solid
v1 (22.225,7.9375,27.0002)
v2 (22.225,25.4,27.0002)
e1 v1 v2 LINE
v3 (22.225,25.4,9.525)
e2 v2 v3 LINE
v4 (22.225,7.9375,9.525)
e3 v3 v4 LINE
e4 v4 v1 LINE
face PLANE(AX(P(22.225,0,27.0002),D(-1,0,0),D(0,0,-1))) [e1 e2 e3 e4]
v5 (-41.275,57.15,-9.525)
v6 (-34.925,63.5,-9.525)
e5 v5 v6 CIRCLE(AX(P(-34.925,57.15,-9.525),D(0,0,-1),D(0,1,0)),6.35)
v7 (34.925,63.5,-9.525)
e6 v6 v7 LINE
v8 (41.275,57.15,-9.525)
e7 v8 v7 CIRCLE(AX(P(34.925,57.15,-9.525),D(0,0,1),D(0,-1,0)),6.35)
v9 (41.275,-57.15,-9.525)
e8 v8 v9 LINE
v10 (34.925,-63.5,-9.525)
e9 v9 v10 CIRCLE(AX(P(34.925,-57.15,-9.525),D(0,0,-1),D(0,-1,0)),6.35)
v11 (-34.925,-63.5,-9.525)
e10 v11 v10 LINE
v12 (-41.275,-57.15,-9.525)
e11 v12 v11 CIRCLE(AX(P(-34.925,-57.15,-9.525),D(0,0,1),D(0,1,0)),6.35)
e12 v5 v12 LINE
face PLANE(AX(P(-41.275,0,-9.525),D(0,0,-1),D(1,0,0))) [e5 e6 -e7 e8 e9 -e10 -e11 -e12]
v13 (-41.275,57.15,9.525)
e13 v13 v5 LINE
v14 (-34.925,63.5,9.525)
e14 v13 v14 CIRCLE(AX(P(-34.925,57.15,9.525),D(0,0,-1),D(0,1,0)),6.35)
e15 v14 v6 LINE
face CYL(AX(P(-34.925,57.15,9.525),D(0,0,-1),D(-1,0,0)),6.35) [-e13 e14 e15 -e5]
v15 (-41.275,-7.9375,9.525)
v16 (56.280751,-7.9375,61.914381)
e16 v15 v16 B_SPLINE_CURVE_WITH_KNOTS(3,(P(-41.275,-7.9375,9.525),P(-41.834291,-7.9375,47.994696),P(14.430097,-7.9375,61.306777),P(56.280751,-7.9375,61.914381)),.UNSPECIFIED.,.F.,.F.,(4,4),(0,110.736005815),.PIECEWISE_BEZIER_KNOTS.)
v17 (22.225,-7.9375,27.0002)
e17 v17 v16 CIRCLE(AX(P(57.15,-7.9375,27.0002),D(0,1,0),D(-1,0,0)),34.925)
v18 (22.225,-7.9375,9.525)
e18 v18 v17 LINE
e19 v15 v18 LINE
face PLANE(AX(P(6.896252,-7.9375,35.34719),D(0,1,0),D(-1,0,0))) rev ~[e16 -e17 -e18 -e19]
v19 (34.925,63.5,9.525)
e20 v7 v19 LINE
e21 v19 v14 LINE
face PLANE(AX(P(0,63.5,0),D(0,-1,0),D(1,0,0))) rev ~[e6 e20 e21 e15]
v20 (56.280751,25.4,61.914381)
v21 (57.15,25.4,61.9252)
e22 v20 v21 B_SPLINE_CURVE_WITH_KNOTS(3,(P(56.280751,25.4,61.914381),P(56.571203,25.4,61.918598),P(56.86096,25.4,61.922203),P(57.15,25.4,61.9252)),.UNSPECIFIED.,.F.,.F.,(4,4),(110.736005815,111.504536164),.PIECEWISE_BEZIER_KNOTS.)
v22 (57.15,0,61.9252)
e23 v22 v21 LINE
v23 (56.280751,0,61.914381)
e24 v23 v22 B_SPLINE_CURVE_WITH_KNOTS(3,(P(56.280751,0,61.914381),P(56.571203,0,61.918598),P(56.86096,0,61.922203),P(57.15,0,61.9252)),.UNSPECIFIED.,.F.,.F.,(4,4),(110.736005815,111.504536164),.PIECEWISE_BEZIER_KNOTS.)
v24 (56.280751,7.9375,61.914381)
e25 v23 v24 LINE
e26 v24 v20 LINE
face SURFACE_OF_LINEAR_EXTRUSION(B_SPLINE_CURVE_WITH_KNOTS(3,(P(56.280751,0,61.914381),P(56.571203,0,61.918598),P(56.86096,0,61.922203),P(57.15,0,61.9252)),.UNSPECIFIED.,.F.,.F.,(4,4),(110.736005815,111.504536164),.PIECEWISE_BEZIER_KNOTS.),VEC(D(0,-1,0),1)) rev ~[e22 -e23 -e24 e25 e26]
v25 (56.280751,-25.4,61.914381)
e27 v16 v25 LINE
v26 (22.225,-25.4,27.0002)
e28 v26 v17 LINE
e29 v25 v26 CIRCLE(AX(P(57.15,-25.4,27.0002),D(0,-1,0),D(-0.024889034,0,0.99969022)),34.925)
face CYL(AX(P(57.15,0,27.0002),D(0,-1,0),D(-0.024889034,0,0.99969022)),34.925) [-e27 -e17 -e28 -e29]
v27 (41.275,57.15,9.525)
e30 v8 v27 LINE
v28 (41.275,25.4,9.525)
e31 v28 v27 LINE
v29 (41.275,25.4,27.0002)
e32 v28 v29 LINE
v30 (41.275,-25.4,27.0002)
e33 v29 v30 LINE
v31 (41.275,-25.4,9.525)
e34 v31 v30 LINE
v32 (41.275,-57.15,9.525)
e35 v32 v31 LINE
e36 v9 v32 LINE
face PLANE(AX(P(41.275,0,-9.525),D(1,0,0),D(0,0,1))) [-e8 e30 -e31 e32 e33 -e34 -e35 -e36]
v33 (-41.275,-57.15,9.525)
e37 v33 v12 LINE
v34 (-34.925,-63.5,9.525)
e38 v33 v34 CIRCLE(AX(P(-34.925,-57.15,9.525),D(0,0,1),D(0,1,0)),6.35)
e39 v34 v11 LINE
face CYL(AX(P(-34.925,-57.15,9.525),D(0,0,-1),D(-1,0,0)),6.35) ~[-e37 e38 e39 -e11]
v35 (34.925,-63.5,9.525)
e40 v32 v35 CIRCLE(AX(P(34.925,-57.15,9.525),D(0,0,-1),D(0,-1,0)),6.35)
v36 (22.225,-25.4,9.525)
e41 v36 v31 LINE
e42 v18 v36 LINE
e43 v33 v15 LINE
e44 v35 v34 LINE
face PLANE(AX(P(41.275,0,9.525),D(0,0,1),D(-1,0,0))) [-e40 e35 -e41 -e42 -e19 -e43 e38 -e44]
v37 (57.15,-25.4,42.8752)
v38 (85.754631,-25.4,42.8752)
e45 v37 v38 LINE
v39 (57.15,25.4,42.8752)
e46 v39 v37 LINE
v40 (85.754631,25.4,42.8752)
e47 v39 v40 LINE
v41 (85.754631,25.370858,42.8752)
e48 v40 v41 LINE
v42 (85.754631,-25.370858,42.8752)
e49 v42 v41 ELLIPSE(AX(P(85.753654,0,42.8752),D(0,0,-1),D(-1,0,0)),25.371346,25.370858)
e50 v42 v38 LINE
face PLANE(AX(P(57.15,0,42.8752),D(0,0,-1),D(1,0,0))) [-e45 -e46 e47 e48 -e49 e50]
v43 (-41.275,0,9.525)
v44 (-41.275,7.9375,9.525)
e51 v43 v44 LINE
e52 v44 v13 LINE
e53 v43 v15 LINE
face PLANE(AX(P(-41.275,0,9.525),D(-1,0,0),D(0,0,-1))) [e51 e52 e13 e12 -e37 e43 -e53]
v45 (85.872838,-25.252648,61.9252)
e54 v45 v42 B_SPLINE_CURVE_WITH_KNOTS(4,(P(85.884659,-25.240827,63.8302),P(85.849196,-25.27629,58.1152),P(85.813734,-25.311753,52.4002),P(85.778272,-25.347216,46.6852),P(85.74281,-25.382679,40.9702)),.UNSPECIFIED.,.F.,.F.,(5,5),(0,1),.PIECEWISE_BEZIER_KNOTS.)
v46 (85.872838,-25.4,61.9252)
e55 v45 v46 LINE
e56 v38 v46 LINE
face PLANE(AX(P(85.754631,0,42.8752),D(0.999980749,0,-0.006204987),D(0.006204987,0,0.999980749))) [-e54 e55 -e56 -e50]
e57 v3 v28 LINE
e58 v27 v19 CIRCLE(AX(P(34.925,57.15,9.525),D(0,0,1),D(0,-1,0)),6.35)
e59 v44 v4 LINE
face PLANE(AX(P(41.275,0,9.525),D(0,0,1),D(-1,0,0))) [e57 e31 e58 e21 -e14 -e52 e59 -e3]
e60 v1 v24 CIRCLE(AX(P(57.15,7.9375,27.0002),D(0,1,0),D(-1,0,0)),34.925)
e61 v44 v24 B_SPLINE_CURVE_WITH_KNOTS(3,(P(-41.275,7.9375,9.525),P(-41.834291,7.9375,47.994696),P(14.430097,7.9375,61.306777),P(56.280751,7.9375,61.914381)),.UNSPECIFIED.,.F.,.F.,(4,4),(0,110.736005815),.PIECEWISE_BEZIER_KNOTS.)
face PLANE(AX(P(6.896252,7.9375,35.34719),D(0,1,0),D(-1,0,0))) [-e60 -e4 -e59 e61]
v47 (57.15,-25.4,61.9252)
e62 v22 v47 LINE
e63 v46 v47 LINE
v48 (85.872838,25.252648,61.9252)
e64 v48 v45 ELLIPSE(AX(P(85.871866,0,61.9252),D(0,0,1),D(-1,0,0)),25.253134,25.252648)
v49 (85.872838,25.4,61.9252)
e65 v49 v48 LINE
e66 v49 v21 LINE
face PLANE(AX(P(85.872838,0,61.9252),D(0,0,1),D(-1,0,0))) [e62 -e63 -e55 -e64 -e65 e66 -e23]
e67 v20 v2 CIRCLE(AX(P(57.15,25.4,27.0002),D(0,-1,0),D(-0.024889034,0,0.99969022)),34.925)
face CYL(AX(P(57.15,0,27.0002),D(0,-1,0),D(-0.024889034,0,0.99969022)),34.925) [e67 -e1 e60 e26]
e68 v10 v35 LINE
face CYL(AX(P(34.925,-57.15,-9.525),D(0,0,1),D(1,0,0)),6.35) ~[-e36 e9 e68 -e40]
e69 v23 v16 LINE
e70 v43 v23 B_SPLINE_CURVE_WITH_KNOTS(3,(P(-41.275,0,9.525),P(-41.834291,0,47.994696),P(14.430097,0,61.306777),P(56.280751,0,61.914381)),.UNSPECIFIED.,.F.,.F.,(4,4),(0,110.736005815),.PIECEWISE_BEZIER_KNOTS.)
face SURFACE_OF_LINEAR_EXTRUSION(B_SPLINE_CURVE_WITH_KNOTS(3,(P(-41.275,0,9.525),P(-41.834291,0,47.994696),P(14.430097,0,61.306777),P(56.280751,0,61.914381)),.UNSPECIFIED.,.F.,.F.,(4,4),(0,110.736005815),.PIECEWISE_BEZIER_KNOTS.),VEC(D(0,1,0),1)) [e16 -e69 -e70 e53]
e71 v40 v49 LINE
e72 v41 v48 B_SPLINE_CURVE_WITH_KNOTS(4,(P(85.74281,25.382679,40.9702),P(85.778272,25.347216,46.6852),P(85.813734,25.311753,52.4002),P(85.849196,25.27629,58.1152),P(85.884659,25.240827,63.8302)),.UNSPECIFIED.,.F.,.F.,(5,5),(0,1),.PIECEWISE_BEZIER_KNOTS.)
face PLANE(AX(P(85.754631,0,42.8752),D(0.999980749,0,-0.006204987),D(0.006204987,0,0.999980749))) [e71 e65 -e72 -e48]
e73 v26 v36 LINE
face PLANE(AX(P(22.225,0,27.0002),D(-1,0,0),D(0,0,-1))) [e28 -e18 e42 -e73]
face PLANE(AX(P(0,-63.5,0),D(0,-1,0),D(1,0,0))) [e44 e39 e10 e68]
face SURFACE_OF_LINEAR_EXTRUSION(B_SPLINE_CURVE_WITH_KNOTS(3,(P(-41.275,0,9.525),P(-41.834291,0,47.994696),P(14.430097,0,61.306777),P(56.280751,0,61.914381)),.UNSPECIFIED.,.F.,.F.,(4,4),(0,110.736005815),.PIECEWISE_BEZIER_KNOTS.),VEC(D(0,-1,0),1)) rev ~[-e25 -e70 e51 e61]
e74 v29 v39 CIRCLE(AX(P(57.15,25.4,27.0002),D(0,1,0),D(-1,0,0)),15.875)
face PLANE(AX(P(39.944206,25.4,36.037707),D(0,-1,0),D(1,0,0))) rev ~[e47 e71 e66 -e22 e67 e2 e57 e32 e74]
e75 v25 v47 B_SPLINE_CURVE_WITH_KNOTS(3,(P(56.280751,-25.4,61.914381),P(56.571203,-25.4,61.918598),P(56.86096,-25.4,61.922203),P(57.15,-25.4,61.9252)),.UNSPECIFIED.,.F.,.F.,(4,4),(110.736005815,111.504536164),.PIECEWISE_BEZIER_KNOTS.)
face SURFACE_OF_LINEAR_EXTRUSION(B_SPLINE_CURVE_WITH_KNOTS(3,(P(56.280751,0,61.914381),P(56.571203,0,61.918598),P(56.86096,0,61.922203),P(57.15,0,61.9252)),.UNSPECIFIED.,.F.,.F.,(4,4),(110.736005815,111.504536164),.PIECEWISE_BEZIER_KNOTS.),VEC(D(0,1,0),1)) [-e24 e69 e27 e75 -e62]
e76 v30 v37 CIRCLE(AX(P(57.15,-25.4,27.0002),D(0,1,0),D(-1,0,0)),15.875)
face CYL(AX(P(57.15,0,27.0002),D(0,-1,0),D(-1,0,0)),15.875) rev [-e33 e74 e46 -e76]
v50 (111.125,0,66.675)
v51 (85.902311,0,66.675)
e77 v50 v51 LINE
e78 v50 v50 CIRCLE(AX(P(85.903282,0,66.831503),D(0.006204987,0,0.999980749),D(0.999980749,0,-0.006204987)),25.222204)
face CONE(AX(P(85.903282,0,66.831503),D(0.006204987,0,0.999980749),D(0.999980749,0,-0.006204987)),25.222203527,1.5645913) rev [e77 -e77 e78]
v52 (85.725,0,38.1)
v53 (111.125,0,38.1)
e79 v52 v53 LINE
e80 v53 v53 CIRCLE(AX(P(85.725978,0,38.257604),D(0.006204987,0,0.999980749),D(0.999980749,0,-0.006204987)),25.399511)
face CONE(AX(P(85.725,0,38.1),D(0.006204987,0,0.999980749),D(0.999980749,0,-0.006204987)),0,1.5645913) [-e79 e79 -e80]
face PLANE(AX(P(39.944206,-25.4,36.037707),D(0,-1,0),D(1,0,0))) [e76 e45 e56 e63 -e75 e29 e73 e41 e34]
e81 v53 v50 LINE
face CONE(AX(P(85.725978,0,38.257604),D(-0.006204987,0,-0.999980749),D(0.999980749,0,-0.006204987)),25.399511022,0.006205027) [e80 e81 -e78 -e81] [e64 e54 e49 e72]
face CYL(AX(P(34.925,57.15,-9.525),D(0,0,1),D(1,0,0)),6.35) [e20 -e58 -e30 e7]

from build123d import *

# Parameters (mm, degrees)
F1_DEPTH = 63.5
F2_DEPTH = 25.4
F3_DEPTH = 7.9375
F5_R     = 6.35


with BuildPart() as f1:
    # F0 (on Front) → F1 (new body, symmetric)
    with BuildSketch(Plane.XZ):
        Polygon((22.225, 9.525), (-41.275, 9.525), (-41.275, -9.525), (41.275, -9.525), (41.275, 9.525), align=None)
    extrude(amount=F1_DEPTH, both=True)

    # F0 (on Front) → F2 (join, symmetric)
    with BuildSketch(Plane.XZ):
        with BuildLine():
            Line((22.225, 27.0002), (22.225, 9.525))
            Line((22.225, 9.525), (41.275, 9.525))
            Line((41.275, 9.525), (41.275, 27.0002))
            ThreePointArc((41.275, 27.0002), (45.9246798487, 38.2255201513), (57.15, 42.8752))
            Line((57.15, 42.8752), (60.325, 42.8752))
            Line((60.325, 42.8752), (60.325, 61.9252))
            Line((60.325, 61.9252), (57.15, 61.9252))
            add(Edge.make_bspline(
                [(56.2807505005, 61.9143809342), (56.5712025295, 61.918597831), (56.8609603005, 61.9222027986), (57.15, 61.9252)],
                knots=[110.7360058155, 110.7360058155, 110.7360058155, 110.7360058155, 111.5045361635, 111.5045361635, 111.5045361635, 111.5045361635], degree=3))
            ThreePointArc((56.2807505005, 61.9143809342), (32.1488583884, 51.3866417887), (22.225, 27.0002))
        make_face()
        Polygon((85.8728378947, 61.9252), (60.325, 61.9252), (60.325, 42.8752), (85.7546306228, 42.8752), align=None)
    extrude(amount=F2_DEPTH, both=True)

    # F0 (on Front) → F3 (join, symmetric)
    with BuildSketch(Plane.XZ):
        with BuildLine():
            add(Edge.make_bspline(
                [(-41.275, 9.525), (-41.8342912286, 47.9946959392), (14.430096654, 61.3067766904), (56.2807505005, 61.9143809342)],
                knots=[0, 0, 0, 0, 110.7360058155, 110.7360058155, 110.7360058155, 110.7360058155], degree=3))
            Line((-41.275, 9.525), (22.225, 9.525))
            Line((22.225, 9.525), (22.225, 27.0002))
            ThreePointArc((22.225, 27.0002), (32.1488583884, 51.3866417887), (56.2807505005, 61.9143809342))
        make_face()
    extrude(amount=F3_DEPTH, both=True)

    # F0 (on Front) → F4 (revolve)
    with BuildSketch(Plane.XZ):
        Polygon((85.9023109078, 66.675), (85.8728378947, 61.9252), (85.7546306228, 42.8752), (85.725, 38.1), (111.125, 38.1), (111.125, 66.675), align=None)
    revolve(axis=Axis((85.8136554539, 0, 52.3875), (0.0062049867, 0, 0.9999807489)))

    # F5
    f5_edges = [f1.edges().sort_by_distance(p)[0] for p in [
        (41.275, -63.5, 0),
        (41.275, 63.5, 0),
        (-41.275, 63.5, 0),
        (-41.275, -63.5, 0),
    ]]
    fillet(f5_edges, radius=F5_R)


solid = f1.part
